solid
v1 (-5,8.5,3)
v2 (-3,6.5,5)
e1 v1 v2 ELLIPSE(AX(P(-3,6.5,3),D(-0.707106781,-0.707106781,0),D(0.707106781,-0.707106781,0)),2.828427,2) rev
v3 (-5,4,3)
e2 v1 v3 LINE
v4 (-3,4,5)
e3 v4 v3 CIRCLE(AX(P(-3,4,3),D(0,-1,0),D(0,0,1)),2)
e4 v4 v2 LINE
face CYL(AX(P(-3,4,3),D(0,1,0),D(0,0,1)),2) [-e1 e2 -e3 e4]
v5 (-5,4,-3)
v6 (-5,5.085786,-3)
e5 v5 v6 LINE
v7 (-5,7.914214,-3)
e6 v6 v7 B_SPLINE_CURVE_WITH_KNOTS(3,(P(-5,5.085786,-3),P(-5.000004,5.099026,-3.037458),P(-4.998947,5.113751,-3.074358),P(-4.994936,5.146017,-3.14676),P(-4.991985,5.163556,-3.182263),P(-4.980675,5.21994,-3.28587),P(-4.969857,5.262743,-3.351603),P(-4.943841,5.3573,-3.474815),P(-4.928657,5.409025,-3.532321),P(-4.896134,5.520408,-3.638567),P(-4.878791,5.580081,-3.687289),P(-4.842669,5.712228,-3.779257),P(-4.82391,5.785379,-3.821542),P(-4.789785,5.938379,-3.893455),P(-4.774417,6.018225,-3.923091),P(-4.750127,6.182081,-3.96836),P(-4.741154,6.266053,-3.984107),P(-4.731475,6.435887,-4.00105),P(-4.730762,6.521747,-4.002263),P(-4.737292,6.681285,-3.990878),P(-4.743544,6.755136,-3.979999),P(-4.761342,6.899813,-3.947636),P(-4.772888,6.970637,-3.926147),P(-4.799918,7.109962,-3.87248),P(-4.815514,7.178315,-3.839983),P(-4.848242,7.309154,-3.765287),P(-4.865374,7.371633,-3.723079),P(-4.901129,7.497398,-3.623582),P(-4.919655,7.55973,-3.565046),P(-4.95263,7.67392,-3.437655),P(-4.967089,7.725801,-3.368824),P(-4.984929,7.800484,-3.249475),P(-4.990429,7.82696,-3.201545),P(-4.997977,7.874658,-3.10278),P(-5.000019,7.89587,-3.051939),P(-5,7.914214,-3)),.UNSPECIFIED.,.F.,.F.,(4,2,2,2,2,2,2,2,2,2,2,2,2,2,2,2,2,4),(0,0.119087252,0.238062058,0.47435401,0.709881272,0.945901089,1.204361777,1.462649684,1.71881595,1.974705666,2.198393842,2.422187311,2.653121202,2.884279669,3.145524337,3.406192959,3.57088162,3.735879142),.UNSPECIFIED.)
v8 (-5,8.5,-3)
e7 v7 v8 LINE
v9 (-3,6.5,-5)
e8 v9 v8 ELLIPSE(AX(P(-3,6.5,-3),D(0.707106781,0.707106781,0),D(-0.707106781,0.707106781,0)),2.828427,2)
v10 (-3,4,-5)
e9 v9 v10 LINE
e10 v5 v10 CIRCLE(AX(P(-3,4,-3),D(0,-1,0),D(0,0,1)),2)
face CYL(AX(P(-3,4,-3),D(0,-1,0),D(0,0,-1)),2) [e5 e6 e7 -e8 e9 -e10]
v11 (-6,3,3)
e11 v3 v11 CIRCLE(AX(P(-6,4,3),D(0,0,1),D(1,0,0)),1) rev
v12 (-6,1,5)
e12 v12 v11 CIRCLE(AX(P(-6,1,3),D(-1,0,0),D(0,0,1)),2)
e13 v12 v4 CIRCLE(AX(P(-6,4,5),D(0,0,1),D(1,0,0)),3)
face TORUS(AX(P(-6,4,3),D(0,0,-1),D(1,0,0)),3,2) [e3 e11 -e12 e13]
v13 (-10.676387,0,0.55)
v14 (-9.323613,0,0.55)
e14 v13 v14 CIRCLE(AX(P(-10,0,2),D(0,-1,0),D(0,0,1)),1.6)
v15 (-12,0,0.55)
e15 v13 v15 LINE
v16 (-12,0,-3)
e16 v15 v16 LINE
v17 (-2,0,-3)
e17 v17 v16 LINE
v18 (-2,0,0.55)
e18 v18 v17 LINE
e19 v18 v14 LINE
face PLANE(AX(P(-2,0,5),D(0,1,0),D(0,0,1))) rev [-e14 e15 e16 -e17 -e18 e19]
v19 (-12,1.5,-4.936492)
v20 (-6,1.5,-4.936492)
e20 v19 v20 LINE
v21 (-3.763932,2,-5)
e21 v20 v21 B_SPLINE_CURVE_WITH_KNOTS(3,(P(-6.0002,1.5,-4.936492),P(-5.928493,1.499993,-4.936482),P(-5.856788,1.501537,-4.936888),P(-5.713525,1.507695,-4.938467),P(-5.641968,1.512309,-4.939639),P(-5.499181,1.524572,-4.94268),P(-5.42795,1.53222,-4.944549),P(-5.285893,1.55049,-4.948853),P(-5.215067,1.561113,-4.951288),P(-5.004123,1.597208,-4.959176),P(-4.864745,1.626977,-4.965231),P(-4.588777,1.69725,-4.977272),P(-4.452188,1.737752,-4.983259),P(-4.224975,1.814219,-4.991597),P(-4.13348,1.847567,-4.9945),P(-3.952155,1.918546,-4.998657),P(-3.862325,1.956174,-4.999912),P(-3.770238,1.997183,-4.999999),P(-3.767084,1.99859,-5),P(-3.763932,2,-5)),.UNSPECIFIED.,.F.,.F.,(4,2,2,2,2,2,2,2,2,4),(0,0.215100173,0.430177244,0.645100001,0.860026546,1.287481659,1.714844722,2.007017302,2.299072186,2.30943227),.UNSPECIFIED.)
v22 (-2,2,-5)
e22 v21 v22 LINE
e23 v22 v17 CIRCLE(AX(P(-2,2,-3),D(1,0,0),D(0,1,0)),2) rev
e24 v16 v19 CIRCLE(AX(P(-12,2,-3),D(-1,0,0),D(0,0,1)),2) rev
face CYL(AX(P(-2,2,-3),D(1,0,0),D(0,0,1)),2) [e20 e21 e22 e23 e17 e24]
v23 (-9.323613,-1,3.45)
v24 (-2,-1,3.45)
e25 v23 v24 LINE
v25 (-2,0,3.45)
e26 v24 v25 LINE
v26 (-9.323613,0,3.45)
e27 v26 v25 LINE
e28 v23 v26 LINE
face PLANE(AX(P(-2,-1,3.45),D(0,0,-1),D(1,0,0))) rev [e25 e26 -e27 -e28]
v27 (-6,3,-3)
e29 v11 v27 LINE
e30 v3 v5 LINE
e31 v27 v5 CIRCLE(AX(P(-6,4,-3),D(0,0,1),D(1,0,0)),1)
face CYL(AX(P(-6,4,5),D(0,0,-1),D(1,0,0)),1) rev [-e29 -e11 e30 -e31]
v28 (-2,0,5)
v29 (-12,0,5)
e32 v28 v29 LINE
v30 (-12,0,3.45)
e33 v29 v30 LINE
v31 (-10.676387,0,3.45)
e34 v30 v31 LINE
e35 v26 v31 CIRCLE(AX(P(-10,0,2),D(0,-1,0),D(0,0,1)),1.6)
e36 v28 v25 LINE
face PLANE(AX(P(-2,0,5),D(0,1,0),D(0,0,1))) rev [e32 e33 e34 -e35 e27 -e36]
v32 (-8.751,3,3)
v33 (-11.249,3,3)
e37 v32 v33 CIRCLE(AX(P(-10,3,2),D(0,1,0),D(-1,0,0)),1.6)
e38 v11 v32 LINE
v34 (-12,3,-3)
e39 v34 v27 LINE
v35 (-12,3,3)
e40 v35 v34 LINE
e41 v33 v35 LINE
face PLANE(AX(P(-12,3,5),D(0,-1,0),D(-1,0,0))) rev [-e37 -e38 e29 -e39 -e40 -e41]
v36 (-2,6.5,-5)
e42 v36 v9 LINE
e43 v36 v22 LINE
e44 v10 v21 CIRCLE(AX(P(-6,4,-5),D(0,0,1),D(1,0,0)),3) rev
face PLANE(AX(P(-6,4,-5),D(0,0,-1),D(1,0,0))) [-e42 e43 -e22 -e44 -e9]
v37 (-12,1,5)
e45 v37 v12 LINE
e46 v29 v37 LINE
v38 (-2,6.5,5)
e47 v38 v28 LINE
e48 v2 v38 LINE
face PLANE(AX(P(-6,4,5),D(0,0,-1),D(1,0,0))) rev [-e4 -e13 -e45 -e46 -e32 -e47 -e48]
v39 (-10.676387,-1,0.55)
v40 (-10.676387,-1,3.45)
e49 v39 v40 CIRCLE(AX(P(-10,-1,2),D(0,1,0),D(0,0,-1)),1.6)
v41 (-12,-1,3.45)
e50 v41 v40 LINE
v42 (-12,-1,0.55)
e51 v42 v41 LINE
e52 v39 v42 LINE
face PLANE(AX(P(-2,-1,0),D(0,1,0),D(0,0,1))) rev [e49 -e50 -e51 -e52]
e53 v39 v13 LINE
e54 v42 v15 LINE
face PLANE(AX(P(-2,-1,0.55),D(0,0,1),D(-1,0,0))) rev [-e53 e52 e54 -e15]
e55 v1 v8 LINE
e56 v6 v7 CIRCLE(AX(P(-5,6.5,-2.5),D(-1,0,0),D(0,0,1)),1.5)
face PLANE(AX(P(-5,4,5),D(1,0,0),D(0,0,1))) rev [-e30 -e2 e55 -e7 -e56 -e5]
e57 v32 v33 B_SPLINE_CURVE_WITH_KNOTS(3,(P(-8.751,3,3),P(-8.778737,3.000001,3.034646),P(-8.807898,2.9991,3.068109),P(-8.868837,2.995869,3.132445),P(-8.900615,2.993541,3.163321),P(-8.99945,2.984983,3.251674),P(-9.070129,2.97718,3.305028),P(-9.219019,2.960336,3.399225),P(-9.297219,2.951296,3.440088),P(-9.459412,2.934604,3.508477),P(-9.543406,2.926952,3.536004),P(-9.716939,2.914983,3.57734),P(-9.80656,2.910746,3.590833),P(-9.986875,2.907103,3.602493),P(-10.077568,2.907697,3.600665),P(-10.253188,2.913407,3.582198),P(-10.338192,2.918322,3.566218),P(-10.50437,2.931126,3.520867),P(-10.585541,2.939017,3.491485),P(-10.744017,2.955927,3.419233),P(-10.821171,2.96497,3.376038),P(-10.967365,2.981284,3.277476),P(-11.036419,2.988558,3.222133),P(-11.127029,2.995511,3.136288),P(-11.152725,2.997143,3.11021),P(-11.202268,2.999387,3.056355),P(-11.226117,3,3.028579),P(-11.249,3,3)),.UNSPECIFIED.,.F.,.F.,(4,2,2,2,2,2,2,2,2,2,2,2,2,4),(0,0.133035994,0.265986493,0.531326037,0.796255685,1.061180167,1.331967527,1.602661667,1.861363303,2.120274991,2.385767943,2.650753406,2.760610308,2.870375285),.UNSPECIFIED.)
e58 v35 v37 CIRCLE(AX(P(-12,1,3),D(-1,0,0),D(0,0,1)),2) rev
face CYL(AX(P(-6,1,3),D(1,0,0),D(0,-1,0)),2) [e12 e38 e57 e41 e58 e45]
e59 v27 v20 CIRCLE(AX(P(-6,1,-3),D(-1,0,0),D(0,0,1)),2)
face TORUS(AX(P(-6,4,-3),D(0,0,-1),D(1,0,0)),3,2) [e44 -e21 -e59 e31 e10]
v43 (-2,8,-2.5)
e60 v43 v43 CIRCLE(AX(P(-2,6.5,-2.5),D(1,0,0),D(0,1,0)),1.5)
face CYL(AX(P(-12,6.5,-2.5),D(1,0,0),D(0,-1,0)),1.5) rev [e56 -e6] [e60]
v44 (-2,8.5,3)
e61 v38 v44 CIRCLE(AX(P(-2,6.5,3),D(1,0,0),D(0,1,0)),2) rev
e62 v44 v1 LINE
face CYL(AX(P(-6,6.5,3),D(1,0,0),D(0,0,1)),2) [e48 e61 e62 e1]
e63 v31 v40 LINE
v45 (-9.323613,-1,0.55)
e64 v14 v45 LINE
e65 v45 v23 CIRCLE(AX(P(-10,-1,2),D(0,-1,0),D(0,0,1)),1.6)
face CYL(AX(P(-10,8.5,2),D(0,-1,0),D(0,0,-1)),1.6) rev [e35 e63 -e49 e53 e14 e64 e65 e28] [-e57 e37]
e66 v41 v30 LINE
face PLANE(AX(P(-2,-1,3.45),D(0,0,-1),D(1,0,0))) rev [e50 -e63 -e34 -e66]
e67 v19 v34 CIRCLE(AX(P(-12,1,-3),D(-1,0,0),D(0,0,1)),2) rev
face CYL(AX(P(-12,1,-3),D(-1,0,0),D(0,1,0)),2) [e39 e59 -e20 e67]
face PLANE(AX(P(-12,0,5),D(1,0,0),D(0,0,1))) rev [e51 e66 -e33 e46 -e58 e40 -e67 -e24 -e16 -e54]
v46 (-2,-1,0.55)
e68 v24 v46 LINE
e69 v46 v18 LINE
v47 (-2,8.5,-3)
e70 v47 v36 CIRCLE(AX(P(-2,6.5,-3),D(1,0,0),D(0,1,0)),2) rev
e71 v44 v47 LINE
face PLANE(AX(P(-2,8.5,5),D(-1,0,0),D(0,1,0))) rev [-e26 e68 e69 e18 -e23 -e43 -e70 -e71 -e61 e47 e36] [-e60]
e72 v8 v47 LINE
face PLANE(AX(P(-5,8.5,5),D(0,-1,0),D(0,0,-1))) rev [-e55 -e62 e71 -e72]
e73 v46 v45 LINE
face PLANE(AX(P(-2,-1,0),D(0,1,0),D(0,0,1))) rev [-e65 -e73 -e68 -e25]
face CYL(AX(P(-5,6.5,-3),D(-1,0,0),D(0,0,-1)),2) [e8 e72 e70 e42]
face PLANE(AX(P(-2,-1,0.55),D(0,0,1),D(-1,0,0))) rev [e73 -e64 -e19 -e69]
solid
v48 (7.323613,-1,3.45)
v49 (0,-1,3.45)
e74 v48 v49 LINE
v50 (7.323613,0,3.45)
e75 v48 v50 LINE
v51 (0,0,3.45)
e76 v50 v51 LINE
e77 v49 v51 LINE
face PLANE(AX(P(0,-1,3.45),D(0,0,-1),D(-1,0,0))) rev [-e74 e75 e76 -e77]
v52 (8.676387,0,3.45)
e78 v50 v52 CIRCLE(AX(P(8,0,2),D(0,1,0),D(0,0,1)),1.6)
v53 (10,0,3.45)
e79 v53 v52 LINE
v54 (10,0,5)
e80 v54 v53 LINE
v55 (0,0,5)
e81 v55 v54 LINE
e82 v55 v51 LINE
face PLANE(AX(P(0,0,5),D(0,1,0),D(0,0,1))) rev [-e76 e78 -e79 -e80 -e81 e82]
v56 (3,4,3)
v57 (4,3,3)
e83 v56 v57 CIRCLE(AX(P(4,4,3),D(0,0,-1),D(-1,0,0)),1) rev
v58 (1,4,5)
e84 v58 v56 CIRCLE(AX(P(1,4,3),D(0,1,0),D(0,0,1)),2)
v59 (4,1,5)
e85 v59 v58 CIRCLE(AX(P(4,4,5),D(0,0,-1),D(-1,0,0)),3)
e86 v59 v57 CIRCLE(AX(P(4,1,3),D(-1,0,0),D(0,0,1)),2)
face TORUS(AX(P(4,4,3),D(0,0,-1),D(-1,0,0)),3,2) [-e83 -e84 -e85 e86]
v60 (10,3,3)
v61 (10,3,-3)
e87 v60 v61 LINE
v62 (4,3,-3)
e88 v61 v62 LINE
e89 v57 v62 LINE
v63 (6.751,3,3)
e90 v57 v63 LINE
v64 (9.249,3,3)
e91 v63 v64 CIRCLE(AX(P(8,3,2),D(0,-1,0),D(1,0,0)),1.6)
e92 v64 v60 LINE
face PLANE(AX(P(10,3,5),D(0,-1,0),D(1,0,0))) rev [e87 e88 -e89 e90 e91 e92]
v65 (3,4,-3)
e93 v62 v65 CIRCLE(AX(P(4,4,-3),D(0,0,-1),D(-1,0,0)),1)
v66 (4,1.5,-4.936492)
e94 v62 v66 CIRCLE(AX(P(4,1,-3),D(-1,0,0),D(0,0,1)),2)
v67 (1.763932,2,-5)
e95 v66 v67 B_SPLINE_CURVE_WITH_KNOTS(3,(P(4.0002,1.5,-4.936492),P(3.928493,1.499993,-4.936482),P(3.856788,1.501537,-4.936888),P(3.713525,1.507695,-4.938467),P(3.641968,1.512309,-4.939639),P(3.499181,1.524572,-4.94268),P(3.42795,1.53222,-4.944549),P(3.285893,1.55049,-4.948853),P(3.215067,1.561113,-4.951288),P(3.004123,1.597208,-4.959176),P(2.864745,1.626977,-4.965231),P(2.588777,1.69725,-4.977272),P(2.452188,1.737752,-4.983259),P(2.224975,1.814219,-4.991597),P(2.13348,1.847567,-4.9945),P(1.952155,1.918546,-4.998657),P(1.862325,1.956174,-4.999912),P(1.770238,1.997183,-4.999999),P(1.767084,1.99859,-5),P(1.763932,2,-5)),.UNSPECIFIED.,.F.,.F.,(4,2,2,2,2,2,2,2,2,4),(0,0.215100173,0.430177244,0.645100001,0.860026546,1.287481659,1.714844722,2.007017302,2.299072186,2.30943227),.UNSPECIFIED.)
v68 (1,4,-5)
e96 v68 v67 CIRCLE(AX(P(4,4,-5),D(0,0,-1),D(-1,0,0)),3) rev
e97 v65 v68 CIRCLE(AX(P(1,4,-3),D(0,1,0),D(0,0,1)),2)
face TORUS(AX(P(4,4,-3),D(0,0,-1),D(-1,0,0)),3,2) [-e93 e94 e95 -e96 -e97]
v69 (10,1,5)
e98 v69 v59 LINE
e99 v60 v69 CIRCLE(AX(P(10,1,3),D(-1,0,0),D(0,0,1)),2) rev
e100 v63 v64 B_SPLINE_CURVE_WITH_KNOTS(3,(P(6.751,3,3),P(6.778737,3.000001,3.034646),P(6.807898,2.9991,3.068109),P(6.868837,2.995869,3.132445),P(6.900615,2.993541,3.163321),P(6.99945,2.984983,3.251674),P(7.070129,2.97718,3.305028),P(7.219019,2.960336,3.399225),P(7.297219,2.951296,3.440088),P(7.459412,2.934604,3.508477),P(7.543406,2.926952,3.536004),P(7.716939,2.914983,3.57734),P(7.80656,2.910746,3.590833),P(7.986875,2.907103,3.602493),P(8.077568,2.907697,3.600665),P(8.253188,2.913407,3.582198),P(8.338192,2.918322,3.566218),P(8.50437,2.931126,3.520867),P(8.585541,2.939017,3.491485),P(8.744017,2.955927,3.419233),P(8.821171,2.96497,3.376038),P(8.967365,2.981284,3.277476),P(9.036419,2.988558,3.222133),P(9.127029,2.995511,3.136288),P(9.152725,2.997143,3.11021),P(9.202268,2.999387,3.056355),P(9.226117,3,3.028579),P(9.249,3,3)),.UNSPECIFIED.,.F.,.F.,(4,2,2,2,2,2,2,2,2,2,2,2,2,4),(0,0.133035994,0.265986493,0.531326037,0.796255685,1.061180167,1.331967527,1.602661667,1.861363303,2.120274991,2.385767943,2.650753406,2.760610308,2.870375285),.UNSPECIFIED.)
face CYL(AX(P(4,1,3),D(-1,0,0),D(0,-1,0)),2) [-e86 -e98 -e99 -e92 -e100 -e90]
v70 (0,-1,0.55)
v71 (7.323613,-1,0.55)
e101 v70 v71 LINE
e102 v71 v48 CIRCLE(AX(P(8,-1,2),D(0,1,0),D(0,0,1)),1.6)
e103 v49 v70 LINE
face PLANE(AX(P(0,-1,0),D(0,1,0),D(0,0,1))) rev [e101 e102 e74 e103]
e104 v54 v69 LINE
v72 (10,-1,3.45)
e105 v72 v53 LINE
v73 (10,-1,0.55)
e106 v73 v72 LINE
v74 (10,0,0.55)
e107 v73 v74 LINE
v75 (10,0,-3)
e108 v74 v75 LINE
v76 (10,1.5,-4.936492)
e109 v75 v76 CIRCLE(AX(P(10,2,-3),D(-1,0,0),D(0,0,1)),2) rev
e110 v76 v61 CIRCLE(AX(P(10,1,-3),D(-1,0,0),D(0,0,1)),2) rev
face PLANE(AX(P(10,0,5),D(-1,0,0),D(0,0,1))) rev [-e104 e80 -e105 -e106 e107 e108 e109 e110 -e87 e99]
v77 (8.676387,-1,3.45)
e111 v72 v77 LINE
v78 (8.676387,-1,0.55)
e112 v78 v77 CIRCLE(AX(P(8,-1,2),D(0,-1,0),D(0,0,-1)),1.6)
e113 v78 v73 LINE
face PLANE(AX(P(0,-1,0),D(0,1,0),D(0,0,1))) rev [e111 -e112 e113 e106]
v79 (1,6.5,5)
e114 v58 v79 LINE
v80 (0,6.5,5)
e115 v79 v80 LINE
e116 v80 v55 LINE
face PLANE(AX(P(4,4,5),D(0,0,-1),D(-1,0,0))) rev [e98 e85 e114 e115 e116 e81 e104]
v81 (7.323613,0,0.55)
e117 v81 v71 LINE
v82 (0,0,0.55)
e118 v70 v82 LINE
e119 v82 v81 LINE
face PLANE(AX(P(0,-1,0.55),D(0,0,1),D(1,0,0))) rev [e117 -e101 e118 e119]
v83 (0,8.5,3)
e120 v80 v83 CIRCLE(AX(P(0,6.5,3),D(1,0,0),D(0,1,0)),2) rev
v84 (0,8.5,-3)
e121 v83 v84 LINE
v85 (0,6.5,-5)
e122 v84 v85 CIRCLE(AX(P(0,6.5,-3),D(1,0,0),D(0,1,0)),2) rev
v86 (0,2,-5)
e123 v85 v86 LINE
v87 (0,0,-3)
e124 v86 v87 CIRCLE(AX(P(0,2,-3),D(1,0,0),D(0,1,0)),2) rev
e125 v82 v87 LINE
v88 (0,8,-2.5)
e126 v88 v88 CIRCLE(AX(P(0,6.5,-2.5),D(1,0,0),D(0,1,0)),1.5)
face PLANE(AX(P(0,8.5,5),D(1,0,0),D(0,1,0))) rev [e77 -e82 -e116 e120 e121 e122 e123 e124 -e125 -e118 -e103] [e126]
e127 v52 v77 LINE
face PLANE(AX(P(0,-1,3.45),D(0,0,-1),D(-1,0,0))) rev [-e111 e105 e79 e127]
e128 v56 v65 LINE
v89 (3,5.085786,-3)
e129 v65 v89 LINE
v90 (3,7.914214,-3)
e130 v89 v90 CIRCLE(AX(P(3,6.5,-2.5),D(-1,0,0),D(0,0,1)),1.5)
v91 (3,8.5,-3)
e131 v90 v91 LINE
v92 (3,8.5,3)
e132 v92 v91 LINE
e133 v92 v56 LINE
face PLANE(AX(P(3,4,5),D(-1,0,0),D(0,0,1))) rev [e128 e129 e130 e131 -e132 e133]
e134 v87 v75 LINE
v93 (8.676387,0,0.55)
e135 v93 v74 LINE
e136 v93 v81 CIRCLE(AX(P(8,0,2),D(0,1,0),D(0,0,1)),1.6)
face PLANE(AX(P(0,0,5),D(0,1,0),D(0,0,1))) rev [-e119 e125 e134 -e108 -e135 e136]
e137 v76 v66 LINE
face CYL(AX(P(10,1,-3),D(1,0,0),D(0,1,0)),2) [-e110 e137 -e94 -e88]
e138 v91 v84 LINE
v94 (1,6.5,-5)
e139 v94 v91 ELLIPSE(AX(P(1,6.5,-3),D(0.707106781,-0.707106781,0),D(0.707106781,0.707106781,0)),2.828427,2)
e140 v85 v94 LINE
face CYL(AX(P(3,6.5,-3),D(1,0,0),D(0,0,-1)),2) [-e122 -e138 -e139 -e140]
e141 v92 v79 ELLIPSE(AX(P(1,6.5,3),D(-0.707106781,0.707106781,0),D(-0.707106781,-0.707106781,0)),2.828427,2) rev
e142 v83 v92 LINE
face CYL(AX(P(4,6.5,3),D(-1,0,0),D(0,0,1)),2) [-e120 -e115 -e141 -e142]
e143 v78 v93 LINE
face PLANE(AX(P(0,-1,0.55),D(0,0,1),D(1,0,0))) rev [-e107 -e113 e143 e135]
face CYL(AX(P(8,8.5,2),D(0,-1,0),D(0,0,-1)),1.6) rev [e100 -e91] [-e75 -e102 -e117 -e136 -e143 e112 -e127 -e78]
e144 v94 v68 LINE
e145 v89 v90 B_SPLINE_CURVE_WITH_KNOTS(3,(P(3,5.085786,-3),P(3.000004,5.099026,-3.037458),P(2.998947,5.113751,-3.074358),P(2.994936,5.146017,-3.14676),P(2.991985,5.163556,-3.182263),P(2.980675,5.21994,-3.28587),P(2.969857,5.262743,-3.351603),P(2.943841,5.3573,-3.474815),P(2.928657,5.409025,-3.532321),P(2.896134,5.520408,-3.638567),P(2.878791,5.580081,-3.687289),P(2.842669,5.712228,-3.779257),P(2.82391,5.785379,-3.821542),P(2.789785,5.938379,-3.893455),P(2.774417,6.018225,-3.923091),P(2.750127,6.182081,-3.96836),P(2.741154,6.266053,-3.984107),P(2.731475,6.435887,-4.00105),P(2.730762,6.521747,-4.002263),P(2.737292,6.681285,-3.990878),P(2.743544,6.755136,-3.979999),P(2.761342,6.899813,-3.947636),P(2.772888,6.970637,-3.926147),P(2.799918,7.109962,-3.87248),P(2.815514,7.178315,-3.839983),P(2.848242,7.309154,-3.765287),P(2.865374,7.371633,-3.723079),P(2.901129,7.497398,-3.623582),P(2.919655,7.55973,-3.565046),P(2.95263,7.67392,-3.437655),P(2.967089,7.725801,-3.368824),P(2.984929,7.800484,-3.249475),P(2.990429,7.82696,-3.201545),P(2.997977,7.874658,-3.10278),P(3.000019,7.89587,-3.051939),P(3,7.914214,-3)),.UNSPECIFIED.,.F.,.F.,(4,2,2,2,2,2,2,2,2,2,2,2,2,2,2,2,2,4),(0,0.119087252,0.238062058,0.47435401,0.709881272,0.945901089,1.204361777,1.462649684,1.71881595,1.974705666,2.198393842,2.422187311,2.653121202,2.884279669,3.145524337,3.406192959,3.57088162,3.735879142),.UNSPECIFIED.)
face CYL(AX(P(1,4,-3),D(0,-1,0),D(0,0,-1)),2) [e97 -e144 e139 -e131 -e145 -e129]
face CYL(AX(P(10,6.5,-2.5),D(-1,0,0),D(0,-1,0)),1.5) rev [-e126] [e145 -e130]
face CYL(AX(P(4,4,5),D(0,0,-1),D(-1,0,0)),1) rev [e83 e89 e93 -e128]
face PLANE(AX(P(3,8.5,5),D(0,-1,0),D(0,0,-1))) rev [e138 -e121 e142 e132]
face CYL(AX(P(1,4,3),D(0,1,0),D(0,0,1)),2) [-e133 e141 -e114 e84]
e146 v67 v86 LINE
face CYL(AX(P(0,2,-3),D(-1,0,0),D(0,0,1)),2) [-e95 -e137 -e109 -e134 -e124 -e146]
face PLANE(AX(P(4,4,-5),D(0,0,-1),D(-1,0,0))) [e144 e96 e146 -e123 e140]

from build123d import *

# Parameters (mm, degrees)
MAIN_DEPTH               = 5
VERTICALHOLE_DEPTH       = 15.044571905
VERTICALHOLE_DEPTH_BACK  = 15.044571905
ESQUISSE2_R              = 1.5
ESQUISSE5_W              = 10
ESQUISSE5_H              = 2.9
MAKERBEAMSUPPORT_DEPTH   = 1
MAKERBEAMHOLE_DEPTH      = 15.044571905
MAKERBEAMHOLE_DEPTH_BACK = 15.044571905
ESQUISSE3_R              = 1.6
FILLET1_R                = 2


with BuildPart() as part:
    # Esquisse1 → Main (new, symmetric)
    with BuildSketch(Plane.XY):
        with BuildLine():
            Line((0, 0), (10, 0))
            Line((10, 0), (10, 3))
            Line((10, 3), (4, 3))
            ThreePointArc((4, 3), (3.292893219, 3.292893219), (3, 4))
            Line((3, 4), (3, 8.5))
            Line((3, 8.5), (0, 8.5))
            Line((0, 8.5), (0, 0))
        make_face()
    extrude(amount=MAIN_DEPTH, both=True)

    # Esquisse2 → VerticalHole (cut, two sides: drawn at the far end of the back side and taken through both)
    with BuildSketch(Plane.ZY.offset(-VERTICALHOLE_DEPTH_BACK)):
        with Locations((-2.5, 6.5)):
            Circle(ESQUISSE2_R)
    extrude(amount=VERTICALHOLE_DEPTH + VERTICALHOLE_DEPTH_BACK, mode=Mode.SUBTRACT)

    # Esquisse5 → MakerBeamSupport (add)
    with BuildSketch(Plane(origin=(0, 0, 0), x_dir=(-1, 0, 0), z_dir=(0, -1, 0))):
        with Locations((-5, -2)):
            Rectangle(ESQUISSE5_W, ESQUISSE5_H)
    extrude(amount=MAKERBEAMSUPPORT_DEPTH)

    # Esquisse3 → MakerBeamHole (cut, two sides: drawn at the far end of the back side and taken through both)
    with BuildSketch(Plane.XZ.offset(-MAKERBEAMHOLE_DEPTH_BACK)):
        with Locations(Location((8, 2, 0), (0, 0, 295.007833235))):
            Circle(ESQUISSE3_R)
    extrude(amount=MAKERBEAMHOLE_DEPTH + MAKERBEAMHOLE_DEPTH_BACK, mode=Mode.SUBTRACT)

    # Fillet1
    # the kernel refuses this fillet: 2 mm, written as the material it takes off along each edge
    with BuildSketch(Plane(origin=(3, 4, -5), x_dir=(-1, 0, 0), z_dir=(0, 1, 0))) as fillet1_piece_1:
        with BuildLine():
            CenterArc((FILLET1_R, FILLET1_R), FILLET1_R, 180, 90)
            Line((0, FILLET1_R), (0, 0))
            Line((0, 0), (FILLET1_R, 0))
        make_face()
    extrude(amount=9.5, mode=Mode.SUBTRACT)
    with BuildSketch(Plane(origin=(4, 4, -5), x_dir=(0, -1, 0), z_dir=(1, 0, 0))) as fillet1_piece_2:
        with BuildLine():
            CenterArc((1 + FILLET1_R, -FILLET1_R), FILLET1_R, 90, 90)
            Line((1, -FILLET1_R), (1, 0))
            Line((1, 0), (1 + FILLET1_R, 0))
        make_face()
    revolve(axis=Axis((4, 4, -5), (0, 0, -1)), revolution_arc=90, mode=Mode.SUBTRACT)
    with BuildSketch(Plane(origin=(3, 4, 5), x_dir=(-1, 0, 0), z_dir=(0, 1, 0))) as fillet1_piece_3:
        with BuildLine():
            CenterArc((FILLET1_R, -FILLET1_R), FILLET1_R, 90, 90)
            Line((0, -FILLET1_R), (0, 0))
            Line((0, 0), (FILLET1_R, 0))
        make_face()
    extrude(amount=9.5, mode=Mode.SUBTRACT)
    with BuildSketch(Plane(origin=(4, 4, 5), x_dir=(0, -1, 0), z_dir=(1, 0, 0))) as fillet1_piece_4:
        with BuildLine():
            CenterArc((1 + FILLET1_R, FILLET1_R), FILLET1_R, 180, 90)
            Line((1, FILLET1_R), (1, 0))
            Line((1, 0), (1 + FILLET1_R, 0))
        make_face()
    revolve(axis=Axis((4, 4, 5), (0, 0, -1)), revolution_arc=90, mode=Mode.SUBTRACT)
    with BuildSketch(Plane(origin=(15, 3, -5), x_dir=(0, -1, 0), z_dir=(-1, 0, 0)), Plane(origin=(15, 3, 5), x_dir=(0, 0, -1), z_dir=(-1, 0, 0))) as fillet1_piece_5:
        with BuildLine():
            CenterArc((FILLET1_R, FILLET1_R), FILLET1_R, 180, 90)
            Line((0, FILLET1_R), (0, 0))
            Line((0, 0), (FILLET1_R, 0))
        make_face()
    extrude(amount=11, mode=Mode.SUBTRACT)
    with BuildSketch(Plane(origin=(8, 8.5, -5), x_dir=(0, -1, 0), z_dir=(-1, 0, 0))) as fillet1_piece_6:
        with BuildLine():
            CenterArc((FILLET1_R, FILLET1_R), FILLET1_R, 180, 90)
            Line((0, FILLET1_R), (0, 0))
            Line((0, 0), (FILLET1_R, 0))
        make_face()
    extrude(amount=13, mode=Mode.SUBTRACT)
    with BuildSketch(Plane(origin=(8, 8.5, 5), x_dir=(0, -1, 0), z_dir=(-1, 0, 0))) as fillet1_piece_7:
        with BuildLine():
            CenterArc((FILLET1_R, -FILLET1_R), FILLET1_R, 90, 90)
            Line((0, -FILLET1_R), (0, 0))
            Line((0, 0), (FILLET1_R, 0))
        make_face()
    extrude(amount=13, mode=Mode.SUBTRACT)
    with BuildSketch(Plane(origin=(-5, 0, -5), x_dir=(0, 0, 1), z_dir=(1, 0, 0))) as fillet1_piece_8:
        with BuildLine():
            CenterArc((FILLET1_R, -FILLET1_R), FILLET1_R, 90, 90)
            Line((0, -FILLET1_R), (0, 0))
            Line((0, 0), (FILLET1_R, 0))
        make_face()
    extrude(amount=20, mode=Mode.SUBTRACT)


with BuildPart() as body_2:
    # Mirror2: mirrored copy
    add(part.part.mirror(Plane.ZY.offset(1)))


solid = Compound([part.part, body_2.part])
